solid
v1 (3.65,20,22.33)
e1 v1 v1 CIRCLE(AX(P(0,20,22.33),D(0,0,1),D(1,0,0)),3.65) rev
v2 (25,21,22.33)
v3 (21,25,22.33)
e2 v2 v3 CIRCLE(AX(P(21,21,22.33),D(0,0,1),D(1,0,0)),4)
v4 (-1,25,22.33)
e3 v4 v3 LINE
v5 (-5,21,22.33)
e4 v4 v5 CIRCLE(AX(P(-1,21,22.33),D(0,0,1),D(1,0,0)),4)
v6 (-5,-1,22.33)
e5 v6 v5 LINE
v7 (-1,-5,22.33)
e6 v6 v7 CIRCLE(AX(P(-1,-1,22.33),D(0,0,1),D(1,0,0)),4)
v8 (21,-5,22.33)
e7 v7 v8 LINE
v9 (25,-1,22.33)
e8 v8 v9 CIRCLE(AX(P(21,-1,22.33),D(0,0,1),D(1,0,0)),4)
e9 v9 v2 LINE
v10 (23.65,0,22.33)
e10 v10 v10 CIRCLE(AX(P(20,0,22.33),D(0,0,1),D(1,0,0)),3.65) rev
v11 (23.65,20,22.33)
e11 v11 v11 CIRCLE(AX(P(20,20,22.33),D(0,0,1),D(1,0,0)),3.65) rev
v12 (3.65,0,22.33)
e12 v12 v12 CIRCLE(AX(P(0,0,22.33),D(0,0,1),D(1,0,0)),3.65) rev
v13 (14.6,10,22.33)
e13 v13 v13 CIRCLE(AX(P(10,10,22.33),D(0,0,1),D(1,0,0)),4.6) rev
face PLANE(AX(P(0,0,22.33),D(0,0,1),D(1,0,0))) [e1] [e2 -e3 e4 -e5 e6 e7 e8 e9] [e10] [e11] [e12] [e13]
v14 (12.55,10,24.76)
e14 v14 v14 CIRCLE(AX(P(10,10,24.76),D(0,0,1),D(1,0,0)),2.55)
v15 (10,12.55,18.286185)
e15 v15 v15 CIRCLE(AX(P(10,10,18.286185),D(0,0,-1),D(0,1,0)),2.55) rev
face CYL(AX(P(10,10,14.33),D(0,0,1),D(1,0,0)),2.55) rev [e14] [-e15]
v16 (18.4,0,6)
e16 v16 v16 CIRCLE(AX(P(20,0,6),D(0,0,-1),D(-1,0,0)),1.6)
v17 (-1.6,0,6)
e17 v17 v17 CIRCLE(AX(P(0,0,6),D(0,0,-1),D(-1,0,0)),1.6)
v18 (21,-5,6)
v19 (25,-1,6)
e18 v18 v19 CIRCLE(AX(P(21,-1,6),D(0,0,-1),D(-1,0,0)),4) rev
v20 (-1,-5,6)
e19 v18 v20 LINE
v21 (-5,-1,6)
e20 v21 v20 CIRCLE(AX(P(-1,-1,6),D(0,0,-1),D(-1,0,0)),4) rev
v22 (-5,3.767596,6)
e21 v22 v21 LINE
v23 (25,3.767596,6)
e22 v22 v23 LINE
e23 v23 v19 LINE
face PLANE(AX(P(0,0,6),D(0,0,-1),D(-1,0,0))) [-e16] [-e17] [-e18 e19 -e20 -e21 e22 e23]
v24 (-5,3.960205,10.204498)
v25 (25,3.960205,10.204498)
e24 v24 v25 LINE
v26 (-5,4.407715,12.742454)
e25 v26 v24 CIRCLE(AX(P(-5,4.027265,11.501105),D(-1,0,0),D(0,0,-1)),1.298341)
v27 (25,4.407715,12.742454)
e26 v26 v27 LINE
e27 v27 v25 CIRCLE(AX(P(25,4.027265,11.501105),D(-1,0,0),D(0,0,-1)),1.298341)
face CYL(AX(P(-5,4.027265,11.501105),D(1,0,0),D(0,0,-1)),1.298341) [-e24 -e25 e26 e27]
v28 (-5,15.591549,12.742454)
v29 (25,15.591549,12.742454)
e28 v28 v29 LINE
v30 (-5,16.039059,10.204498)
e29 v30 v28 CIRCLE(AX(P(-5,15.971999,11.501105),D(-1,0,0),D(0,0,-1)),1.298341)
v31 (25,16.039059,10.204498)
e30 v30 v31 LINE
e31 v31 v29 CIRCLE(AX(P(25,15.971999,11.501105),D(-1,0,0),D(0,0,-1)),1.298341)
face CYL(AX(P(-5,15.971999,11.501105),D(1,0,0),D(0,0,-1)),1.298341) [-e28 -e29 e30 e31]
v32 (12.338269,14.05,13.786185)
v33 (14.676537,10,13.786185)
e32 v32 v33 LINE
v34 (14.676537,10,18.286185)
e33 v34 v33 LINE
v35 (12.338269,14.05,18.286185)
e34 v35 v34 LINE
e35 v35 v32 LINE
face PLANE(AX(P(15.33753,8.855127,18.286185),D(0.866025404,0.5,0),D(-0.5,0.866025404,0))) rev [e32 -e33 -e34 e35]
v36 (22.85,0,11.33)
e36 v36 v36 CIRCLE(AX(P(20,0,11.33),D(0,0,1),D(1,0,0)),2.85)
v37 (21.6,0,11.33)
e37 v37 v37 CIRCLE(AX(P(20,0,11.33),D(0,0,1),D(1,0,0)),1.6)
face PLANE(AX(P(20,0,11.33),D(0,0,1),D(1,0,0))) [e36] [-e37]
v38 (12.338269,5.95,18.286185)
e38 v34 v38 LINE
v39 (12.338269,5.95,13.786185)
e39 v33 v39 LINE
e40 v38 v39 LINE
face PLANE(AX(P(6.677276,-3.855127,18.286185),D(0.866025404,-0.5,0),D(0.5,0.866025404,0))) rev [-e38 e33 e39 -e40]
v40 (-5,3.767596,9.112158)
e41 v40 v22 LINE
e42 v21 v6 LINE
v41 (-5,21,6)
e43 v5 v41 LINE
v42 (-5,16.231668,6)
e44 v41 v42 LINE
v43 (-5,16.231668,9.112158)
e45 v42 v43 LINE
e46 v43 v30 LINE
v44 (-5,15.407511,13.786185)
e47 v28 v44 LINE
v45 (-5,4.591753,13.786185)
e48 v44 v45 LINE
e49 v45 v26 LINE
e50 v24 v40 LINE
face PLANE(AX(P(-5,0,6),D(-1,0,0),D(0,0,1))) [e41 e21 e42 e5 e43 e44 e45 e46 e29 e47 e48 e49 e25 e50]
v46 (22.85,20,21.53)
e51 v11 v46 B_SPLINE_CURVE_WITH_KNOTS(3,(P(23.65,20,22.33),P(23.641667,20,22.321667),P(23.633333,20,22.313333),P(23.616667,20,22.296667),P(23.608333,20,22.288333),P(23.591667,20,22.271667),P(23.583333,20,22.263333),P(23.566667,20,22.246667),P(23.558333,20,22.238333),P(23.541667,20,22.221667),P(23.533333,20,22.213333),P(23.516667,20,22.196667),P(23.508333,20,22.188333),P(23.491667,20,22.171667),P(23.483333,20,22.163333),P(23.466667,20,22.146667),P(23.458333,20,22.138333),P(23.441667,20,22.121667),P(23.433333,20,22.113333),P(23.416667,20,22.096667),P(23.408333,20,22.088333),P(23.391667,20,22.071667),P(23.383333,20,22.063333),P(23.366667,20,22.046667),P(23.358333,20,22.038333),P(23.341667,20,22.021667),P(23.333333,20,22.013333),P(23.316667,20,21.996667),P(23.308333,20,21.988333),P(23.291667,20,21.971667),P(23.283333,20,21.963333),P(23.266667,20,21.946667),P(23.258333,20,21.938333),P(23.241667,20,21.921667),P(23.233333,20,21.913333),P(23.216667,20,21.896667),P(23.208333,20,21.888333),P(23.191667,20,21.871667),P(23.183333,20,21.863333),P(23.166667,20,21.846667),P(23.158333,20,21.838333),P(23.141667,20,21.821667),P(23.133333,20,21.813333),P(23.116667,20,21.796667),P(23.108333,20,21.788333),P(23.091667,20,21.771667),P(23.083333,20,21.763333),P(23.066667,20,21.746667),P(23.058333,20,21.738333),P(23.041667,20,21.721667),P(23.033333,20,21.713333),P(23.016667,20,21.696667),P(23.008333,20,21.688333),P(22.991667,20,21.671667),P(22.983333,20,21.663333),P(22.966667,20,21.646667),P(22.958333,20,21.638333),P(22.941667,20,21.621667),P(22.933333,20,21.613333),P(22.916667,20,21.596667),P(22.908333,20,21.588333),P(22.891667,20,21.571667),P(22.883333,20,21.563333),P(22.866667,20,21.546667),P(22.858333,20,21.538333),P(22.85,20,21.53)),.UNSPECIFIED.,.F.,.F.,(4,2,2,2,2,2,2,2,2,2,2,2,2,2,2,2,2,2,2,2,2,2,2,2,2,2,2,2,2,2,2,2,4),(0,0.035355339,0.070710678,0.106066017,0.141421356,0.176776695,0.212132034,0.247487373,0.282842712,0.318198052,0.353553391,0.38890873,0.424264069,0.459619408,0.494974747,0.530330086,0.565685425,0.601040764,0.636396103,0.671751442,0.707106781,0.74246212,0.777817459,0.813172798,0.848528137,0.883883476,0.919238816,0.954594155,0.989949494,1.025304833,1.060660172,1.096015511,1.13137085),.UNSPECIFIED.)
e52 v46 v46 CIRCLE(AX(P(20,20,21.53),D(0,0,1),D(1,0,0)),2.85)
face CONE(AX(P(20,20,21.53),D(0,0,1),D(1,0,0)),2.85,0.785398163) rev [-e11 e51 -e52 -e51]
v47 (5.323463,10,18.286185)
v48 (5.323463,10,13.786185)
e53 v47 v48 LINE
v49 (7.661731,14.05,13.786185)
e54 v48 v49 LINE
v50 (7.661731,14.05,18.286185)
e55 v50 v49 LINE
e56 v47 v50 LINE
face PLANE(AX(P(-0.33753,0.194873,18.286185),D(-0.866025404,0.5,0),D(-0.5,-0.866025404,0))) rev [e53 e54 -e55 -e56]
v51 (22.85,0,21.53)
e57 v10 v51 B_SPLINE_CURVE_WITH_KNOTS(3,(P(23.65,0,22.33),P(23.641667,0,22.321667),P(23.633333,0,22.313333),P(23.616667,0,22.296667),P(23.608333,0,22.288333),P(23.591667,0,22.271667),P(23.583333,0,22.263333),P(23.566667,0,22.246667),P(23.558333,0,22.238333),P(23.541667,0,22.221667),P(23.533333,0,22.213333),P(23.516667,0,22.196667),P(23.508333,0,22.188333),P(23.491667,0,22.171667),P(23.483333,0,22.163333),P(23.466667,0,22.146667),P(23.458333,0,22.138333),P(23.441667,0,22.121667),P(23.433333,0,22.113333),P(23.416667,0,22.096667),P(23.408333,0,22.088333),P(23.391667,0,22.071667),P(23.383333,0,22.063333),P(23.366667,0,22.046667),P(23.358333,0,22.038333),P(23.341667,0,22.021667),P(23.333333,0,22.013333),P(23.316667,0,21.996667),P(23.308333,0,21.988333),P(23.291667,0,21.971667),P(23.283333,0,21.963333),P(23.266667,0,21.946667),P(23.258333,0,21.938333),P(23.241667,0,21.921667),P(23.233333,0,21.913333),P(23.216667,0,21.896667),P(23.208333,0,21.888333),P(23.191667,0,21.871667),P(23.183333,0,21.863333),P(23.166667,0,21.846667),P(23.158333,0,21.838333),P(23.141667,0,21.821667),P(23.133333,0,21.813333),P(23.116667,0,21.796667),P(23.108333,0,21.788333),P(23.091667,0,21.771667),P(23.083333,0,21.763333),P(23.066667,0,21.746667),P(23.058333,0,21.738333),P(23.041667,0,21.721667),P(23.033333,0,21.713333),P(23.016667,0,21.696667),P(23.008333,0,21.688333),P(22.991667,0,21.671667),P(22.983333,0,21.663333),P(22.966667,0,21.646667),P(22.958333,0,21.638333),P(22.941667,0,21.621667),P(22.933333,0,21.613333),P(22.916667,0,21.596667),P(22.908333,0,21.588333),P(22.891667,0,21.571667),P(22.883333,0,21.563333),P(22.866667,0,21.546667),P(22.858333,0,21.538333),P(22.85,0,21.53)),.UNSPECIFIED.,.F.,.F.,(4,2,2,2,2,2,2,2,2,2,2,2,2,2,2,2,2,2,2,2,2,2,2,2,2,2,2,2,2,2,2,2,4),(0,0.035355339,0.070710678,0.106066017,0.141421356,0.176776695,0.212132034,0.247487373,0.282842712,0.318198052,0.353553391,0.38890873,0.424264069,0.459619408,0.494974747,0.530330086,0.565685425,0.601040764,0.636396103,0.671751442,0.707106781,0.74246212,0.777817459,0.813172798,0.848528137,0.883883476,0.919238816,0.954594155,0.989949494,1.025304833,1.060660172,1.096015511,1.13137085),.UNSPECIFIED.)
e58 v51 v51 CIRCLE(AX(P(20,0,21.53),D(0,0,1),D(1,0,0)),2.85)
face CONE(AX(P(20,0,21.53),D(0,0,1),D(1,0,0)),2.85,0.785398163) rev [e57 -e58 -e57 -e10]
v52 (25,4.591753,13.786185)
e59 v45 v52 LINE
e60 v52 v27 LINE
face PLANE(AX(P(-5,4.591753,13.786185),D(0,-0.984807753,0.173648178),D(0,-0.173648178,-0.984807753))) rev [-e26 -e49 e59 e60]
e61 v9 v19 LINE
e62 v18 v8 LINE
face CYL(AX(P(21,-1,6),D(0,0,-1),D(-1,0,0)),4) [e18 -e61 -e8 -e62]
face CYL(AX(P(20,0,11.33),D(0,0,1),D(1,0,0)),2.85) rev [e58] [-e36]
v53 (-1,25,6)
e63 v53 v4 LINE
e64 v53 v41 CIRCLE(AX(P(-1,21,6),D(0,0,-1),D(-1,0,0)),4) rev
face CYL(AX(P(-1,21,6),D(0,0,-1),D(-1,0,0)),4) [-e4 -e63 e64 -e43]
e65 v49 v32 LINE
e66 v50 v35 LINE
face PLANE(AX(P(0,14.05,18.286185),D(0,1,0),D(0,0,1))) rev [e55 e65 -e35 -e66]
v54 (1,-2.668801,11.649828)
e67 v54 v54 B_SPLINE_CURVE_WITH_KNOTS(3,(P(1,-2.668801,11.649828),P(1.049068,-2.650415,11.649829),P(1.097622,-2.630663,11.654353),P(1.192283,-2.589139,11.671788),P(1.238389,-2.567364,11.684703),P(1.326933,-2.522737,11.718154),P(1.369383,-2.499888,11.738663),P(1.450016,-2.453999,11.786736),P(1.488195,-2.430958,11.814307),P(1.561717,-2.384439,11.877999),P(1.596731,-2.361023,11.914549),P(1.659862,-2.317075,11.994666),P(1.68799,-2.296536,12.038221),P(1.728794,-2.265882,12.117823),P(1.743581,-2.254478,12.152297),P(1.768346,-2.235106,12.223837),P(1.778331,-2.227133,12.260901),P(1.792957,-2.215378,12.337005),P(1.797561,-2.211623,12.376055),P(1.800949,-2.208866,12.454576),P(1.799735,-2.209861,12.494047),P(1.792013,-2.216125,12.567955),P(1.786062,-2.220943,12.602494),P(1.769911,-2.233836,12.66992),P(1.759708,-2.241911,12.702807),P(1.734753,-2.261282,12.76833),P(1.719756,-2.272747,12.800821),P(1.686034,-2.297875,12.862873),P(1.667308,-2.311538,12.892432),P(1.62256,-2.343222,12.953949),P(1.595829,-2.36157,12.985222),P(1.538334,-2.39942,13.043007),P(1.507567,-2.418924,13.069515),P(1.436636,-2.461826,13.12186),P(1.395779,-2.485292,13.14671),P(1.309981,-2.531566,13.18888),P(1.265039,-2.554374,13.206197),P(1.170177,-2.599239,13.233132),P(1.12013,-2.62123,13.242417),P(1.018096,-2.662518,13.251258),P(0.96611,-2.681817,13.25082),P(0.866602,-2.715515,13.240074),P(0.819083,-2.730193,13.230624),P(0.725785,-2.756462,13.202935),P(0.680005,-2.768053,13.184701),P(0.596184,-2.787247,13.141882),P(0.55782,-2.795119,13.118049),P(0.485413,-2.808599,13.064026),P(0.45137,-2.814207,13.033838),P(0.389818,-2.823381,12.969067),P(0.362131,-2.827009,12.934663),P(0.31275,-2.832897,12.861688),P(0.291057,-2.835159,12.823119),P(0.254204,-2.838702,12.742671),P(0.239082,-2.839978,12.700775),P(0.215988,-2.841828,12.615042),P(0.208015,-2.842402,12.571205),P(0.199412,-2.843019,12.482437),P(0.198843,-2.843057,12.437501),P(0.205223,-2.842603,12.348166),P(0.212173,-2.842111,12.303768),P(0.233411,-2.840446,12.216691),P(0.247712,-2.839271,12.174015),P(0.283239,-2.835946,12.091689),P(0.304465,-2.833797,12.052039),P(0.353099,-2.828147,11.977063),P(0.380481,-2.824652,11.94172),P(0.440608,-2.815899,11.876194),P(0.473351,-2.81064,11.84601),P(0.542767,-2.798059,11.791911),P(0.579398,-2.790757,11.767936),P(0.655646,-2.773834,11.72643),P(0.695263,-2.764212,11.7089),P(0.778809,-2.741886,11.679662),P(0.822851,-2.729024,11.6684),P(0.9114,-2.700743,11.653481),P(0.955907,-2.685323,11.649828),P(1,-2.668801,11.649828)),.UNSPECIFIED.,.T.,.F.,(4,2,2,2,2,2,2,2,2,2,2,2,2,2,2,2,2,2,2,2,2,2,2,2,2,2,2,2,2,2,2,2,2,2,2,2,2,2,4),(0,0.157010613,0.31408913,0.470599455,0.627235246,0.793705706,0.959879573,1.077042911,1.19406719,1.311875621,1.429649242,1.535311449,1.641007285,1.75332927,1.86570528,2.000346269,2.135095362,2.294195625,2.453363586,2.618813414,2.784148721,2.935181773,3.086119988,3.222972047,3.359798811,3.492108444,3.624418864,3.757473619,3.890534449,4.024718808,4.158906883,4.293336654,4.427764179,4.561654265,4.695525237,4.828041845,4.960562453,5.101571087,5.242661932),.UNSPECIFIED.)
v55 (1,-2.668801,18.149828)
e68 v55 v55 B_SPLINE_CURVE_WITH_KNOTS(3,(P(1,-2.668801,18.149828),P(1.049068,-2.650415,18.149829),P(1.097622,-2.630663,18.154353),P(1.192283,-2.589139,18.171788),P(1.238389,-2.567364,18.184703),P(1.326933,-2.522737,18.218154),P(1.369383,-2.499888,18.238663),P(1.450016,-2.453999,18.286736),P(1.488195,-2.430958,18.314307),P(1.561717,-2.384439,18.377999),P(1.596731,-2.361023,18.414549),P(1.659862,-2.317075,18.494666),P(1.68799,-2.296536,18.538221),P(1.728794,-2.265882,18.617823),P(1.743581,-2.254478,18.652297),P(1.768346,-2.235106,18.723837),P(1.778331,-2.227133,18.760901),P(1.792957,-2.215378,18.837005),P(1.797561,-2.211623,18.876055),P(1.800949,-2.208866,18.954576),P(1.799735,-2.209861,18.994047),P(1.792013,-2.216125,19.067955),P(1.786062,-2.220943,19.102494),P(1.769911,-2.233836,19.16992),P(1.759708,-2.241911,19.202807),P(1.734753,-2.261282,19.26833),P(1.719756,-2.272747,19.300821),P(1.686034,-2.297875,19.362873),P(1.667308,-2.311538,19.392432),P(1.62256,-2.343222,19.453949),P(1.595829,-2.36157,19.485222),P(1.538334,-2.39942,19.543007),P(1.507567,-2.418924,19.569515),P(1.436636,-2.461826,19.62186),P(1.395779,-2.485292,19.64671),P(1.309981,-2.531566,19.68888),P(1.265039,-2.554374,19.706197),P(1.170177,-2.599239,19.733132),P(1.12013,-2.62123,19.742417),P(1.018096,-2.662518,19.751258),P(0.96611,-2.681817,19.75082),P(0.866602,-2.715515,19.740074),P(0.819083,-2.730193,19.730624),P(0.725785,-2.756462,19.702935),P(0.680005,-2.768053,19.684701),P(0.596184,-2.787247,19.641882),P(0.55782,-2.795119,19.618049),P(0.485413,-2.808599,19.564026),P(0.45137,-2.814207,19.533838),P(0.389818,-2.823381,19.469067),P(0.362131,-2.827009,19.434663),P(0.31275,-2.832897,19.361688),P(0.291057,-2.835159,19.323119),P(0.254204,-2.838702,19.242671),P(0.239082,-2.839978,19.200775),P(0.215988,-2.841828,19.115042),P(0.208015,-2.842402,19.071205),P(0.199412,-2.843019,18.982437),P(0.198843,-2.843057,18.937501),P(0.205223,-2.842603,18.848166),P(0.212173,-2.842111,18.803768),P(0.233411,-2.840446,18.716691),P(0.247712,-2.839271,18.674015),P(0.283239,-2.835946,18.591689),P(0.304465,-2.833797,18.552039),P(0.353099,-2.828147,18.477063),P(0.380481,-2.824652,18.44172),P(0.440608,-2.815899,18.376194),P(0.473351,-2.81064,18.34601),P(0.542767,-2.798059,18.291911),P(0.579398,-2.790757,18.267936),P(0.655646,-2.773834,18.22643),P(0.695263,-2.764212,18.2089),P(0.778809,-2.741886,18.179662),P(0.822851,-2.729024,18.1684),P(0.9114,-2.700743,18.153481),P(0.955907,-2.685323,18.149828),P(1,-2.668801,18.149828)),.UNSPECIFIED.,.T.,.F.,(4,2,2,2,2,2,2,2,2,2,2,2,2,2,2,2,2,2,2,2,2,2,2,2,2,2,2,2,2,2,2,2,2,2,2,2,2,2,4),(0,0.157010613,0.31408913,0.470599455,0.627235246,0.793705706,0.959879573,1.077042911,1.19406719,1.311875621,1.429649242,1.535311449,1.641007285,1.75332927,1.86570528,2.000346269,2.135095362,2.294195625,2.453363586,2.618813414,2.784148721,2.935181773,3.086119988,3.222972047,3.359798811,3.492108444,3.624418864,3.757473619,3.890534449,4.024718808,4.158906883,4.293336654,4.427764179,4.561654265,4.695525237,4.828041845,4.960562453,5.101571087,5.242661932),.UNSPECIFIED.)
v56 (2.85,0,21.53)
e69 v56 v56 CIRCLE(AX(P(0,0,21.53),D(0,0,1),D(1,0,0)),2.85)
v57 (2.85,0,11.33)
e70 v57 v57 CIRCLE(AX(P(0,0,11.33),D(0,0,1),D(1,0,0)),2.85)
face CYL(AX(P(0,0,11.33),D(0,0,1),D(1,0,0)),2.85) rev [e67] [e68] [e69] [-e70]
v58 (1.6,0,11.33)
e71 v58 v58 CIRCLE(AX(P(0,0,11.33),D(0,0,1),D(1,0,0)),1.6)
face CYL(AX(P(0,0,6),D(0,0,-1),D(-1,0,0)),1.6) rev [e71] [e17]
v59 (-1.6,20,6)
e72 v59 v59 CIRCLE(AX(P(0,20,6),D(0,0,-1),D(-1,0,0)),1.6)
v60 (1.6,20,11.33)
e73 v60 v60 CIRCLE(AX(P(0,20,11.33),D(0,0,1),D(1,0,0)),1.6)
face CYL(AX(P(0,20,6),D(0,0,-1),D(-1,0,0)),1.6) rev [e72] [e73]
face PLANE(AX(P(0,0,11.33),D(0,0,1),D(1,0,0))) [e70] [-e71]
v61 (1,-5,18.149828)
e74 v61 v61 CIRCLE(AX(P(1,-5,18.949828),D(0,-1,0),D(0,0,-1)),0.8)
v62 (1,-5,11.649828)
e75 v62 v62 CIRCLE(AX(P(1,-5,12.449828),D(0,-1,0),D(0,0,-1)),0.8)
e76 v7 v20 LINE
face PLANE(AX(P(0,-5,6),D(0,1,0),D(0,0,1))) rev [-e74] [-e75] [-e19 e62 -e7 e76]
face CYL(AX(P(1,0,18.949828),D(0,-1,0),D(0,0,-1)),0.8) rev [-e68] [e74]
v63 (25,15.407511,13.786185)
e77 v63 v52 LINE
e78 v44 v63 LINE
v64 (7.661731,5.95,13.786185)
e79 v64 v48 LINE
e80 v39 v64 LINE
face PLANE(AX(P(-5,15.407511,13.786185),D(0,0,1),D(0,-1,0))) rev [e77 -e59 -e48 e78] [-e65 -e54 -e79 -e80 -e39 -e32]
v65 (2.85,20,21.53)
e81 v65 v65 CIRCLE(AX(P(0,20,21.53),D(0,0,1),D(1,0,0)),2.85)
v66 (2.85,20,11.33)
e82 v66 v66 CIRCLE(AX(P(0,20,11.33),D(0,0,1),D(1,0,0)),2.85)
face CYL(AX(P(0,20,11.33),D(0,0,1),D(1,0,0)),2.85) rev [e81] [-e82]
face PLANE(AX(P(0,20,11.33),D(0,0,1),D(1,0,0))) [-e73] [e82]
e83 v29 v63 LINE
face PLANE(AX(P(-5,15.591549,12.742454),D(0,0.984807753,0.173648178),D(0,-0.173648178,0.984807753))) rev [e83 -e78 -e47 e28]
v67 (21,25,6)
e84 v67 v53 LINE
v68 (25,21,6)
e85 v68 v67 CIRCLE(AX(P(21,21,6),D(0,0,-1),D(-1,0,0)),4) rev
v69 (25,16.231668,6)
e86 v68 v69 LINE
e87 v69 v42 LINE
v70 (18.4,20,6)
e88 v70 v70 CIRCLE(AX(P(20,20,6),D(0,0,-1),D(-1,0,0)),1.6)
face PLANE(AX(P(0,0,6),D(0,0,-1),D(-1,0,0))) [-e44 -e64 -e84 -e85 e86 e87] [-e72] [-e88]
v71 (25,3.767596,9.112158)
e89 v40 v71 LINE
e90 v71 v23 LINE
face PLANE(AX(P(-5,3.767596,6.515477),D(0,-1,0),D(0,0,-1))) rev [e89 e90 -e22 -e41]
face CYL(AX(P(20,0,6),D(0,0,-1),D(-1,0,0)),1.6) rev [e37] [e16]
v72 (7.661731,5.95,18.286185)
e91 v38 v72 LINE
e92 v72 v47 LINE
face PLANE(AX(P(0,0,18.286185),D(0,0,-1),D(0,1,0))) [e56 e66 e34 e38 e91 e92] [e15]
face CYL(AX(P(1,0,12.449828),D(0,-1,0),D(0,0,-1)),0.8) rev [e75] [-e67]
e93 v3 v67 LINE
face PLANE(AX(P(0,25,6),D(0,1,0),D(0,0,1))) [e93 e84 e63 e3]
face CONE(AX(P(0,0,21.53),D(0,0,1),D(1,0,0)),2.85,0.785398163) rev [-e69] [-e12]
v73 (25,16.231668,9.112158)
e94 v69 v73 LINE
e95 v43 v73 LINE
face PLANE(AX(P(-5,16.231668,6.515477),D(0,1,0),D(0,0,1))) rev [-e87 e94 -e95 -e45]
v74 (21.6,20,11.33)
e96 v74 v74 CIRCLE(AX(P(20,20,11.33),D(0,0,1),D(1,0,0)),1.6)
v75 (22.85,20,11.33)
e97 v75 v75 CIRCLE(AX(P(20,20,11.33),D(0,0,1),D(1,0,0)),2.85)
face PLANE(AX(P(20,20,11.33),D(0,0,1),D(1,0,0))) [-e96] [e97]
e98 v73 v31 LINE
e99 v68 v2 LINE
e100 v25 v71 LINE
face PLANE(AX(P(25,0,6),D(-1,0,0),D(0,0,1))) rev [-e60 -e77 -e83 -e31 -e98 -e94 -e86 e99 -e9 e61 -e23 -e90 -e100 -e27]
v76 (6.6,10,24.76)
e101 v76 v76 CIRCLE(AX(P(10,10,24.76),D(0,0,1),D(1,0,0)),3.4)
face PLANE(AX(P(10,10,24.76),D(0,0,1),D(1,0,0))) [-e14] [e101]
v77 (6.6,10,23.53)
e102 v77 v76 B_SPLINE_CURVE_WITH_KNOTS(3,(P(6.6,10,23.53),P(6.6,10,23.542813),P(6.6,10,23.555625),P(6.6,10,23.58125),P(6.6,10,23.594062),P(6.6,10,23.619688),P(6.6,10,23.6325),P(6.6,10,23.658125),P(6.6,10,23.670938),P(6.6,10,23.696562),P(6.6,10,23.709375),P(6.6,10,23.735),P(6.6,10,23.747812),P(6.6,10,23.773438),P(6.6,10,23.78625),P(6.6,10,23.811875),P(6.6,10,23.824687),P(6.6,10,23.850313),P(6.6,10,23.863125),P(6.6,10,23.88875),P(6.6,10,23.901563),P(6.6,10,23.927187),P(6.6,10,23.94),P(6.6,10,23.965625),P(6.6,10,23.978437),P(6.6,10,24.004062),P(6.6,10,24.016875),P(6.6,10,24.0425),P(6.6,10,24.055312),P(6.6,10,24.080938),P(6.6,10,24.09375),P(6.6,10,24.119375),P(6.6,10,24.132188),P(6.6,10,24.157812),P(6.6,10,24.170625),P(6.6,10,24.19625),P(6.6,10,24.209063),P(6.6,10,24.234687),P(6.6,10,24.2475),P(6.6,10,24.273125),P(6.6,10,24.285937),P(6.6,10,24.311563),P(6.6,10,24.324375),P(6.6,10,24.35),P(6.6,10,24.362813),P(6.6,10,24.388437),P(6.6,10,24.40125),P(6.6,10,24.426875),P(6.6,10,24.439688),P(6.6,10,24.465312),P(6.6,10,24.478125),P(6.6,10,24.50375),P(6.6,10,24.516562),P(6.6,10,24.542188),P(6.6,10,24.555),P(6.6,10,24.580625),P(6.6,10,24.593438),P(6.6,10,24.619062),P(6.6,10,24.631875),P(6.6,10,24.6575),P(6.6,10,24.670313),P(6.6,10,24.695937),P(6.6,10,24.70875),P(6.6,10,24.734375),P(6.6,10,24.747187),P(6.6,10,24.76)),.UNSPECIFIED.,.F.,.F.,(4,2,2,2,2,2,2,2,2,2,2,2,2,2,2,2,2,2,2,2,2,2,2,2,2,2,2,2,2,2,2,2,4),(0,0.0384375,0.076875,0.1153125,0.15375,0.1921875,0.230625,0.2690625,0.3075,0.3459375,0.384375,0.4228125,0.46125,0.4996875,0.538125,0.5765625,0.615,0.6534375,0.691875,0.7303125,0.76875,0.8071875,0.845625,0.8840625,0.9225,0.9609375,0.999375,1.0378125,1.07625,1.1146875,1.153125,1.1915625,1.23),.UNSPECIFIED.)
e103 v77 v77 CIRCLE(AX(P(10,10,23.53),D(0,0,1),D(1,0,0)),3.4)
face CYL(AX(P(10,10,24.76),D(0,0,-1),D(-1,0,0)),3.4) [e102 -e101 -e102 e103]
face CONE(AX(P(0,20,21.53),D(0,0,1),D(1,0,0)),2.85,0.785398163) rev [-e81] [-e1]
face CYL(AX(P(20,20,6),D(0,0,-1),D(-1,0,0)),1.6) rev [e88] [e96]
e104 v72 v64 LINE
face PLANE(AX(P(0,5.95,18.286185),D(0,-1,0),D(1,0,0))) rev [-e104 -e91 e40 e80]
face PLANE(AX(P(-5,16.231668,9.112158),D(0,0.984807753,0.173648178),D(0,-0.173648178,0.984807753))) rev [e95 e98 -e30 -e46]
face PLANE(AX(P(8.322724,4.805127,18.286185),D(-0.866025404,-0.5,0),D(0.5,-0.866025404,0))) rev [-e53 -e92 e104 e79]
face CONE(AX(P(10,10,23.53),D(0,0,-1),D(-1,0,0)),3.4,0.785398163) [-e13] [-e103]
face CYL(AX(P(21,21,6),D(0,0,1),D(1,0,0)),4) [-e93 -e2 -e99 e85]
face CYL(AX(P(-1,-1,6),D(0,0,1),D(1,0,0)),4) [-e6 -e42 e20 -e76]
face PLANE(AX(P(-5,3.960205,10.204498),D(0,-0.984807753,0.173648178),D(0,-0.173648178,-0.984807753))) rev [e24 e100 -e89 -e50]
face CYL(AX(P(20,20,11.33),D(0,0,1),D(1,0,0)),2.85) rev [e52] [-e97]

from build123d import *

# Parameters (mm, degrees)
SKETCH1_W                  = 30
SKETCH1_H                  = 30
SKETCH1_R                  = 1.6
SKETCH1_W_2                = 70
SKETCH1_H_2                = 12
BOSS_EXTRUDE1_DEPTH        = 6
SKETCH1_3_W                = 30
SKETCH1_3_H                = 30
SKETCH1_3_R                = 1.6
BOSS_EXTRUDE2_DEPTH        = 22.33
CUT_EXTRUDE1_DEPTH         = 78.612040947
SKETCH3_R                  = 2.55
CUT_EXTRUDE2_DEPTH         = 8
CUT_EXTRUDE3_DEPTH         = 4.5
SKETCH6_R                  = 5
CUT_EXTRUDE5_DEPTH         = 8.6
SKETCH7_R                  = 1.6
CUT_EXTRUDE6_DEPTH         = 101.740403513
SKETCH8_R                  = 2.85
CUT_EXTRUDE7_DEPTH         = 11
BOSS_EXTRUDE3_START        = 2.43
SKETCH9_R                  = 3.4
SKETCH9_R_2                = 2.55
BOSS_EXTRUDE3_DEPTH        = 2.43
CHAMFER1_SIZE              = 1.2
FILLET3_R                  = 4
CHAMFER2_SIZE              = 0.8
CUT_EXTRUDE8_DEPTH         = 3
CHAMFER3_SIZE              = 0.8
LPATTERN1_COUNT            = 3
LPATTERN1_PITCH            = 25
CHAMFER3_OF_LPATTERN1_SIZE = 0.8
SKETCH12_W                 = 103.210606925
SKETCH12_H                 = 33.832940417
CUT_EXTRUDE9_DEPTH         = 6
SKETCH13_R                 = 0.8
CUT_EXTRUDE10_DEPTH        = 5


with BuildPart() as part:
    # Sketch1 → Boss-Extrude1 (new body)
    # profile 1 of 2: a face of its own
    with BuildSketch(Plane.XY):
        with Locations((10, 10)):
            Rectangle(SKETCH1_W, SKETCH1_H)
        with Locations((20, 0)):
            Circle(SKETCH1_R, mode=Mode.SUBTRACT)
        with Locations((20, 20)):
            Circle(SKETCH1_R, mode=Mode.SUBTRACT)
        with Locations((0, 20)):
            Circle(SKETCH1_R, mode=Mode.SUBTRACT)
        Circle(SKETCH1_R, mode=Mode.SUBTRACT)
    # profile 2 of 2: a face of its own
    with BuildSketch(Plane.XY):
        with Locations((60, 10)):
            Rectangle(SKETCH1_W_2, SKETCH1_H_2)
    extrude(amount=BOSS_EXTRUDE1_DEPTH)

    # Sketch1<3> → Boss-Extrude2 (add)
    with BuildSketch(Plane.XY):
        with Locations((10, 10)):
            Rectangle(SKETCH1_3_W, SKETCH1_3_H)
        with Locations((20, 0)):
            Circle(SKETCH1_3_R, mode=Mode.SUBTRACT)
        with Locations((20, 20)):
            Circle(SKETCH1_3_R, mode=Mode.SUBTRACT)
        with Locations((0, 20)):
            Circle(SKETCH1_3_R, mode=Mode.SUBTRACT)
        Circle(SKETCH1_3_R, mode=Mode.SUBTRACT)
    extrude(amount=BOSS_EXTRUDE2_DEPTH)

    # Sketch2 → Cut-Extrude1 (cut, through all)
    with BuildSketch(Plane(origin=(25, 0, 0), x_dir=(0, 0, -1), z_dir=(1, 0, 0))):
        with BuildLine():
            Line((-6.515476918, 16.231667643), (-9.112158418, 16.231667643))
            Line((-9.112158418, 16.231667643), (-10.20449761, 16.039058771))
            ThreePointArc((-10.20449761, 16.039058771), (-11.275650893, 14.693383456), (-12.742453793, 15.59154862))
            Line((-12.742453793, 15.59154862), (-13.786185118, 15.407510627))
            Line((-13.786185118, 15.407510627), (-13.786185118, 4.591753459))
            Line((-13.786185118, 4.591753459), (-12.742453793, 4.407715465))
            ThreePointArc((-12.742453793, 4.407715465), (-11.275650893, 5.305880629), (-10.20449761, 3.960205314))
            Line((-10.20449761, 3.960205314), (-9.112158418, 3.767596443))
            Line((-9.112158418, 3.767596443), (-6.515476918, 3.767596443))
            Line((-6.515476918, 3.767596443), (-5.902540869, 3.767596443))
            Line((-5.902540869, 3.767596443), (-5.902540869, 16.231667643))
            Line((-5.902540869, 16.231667643), (-6.515476918, 16.231667643))
        make_face()
    extrude(amount=-CUT_EXTRUDE1_DEPTH, mode=Mode.SUBTRACT)

    # Sketch3 → Cut-Extrude2 (cut)
    with BuildSketch(Plane.XY.offset(22.33)):
        with Locations((10, 10)):
            Circle(SKETCH3_R)
    extrude(amount=-CUT_EXTRUDE2_DEPTH, mode=Mode.SUBTRACT)

    # Sketch5 → Cut-Extrude3 (cut)
    with BuildSketch(Plane(origin=(0, 0, 13.786185118), x_dir=(-1, 0, 0), z_dir=(0, 0, -1))):
        Polygon((-5.32346282, 10), (-7.66173141, 14.05), (-12.33826859, 14.05), (-14.67653718, 10), (-12.33826859, 5.95), (-7.66173141, 5.95), align=None)
    extrude(amount=-CUT_EXTRUDE3_DEPTH, mode=Mode.SUBTRACT)

    # Sketch6 → Cut-Extrude5 (cut)
    with BuildSketch(Plane(origin=(0, 0, 0), x_dir=(-1, 0, 0), z_dir=(0, 0, -1))):
        with Locations((-10, 10)):
            Circle(SKETCH6_R)
    extrude(amount=-CUT_EXTRUDE5_DEPTH, mode=Mode.SUBTRACT)

    # Sketch7 → Cut-Extrude6 (cut, through all)
    with BuildSketch(Plane(origin=(0, 0, 0), x_dir=(-1, 0, 0), z_dir=(0, 0, -1))):
        with BuildLine():
            ThreePointArc((-90.1, 10), (-88.5, 8.4), (-86.9, 10))
            Line((-86.9, 10), (-90.1, 10))
        make_face()
        with BuildLine():
            Line((-90.1, 10), (-86.9, 10))
            ThreePointArc((-86.9, 10), (-88.5, 11.6), (-90.1, 10))
        make_face()
        with Locations((-63.5, 10)):
            Circle(SKETCH7_R)
        with Locations((-38.5, 10)):
            Circle(SKETCH7_R)
    extrude(amount=-CUT_EXTRUDE6_DEPTH, mode=Mode.SUBTRACT)

    # Sketch8 → Cut-Extrude7 (cut)
    with BuildSketch(Plane.XY.offset(22.33)):
        with Locations((20, 20)):
            Circle(SKETCH8_R)
        with Locations((20, 0)):
            Circle(SKETCH8_R)
        Circle(SKETCH8_R)
        with Locations((0, 20)):
            Circle(SKETCH8_R)
    extrude(amount=-CUT_EXTRUDE7_DEPTH, mode=Mode.SUBTRACT)

    # Sketch9 → Boss-Extrude3 (add)
    with BuildSketch(Plane.XY.offset(22.33).offset(BOSS_EXTRUDE3_START)):
        with Locations(Location((10, 10, 0), (0, 0, 180))):
            Circle(SKETCH9_R)
        with Locations((10, 10)):
            Circle(SKETCH9_R_2, mode=Mode.SUBTRACT)
    extrude(amount=-BOSS_EXTRUDE3_DEPTH)

    # Chamfer1
    chamfer1_edges = [part.edges().sort_by_distance(p)[0] for p in [
        (13.4, 10, 22.33),
    ]]
    chamfer(chamfer1_edges, length=CHAMFER1_SIZE)

    # Fillet3
    # the kernel refuses this fillet: 4 mm, written as the material it adds along each edge
    with BuildSketch(Plane(origin=(25, 4, 0), x_dir=(0, -1, 0), z_dir=(0, 0, 1))) as fillet3_piece_1:
        with BuildLine():
            CenterArc((FILLET3_R, FILLET3_R), FILLET3_R, 180, 90)
            Line((0, FILLET3_R), (0, 0))
            Line((0, 0), (FILLET3_R, 0))
        make_face()
    extrude(amount=5.902540869)
    with BuildSketch(Plane(origin=(25, 16, 0), x_dir=(0, 1, 0), z_dir=(0, 0, 1))) as fillet3_piece_2:
        with BuildLine():
            CenterArc((FILLET3_R, -FILLET3_R), FILLET3_R, 90, 90)
            Line((0, -FILLET3_R), (0, 0))
            Line((0, 0), (FILLET3_R, 0))
        make_face()
    extrude(amount=5.902540869)
    # the kernel refuses this fillet: 4 mm, written as the material it takes off along each edge
    with BuildSketch(Plane(origin=(-5, -5, 32.33), x_dir=(1, 0, 0), z_dir=(0, 0, -1)), Plane(origin=(-5, 25, 32.33), x_dir=(0, -1, 0), z_dir=(0, 0, -1)), Plane(origin=(25, 25, -10), x_dir=(0, -1, 0), z_dir=(0, 0, 1)), Plane(origin=(25, -5, -10), x_dir=(-1, 0, 0), z_dir=(0, 0, 1))) as fillet3_2_piece_1:
        with BuildLine():
            CenterArc((FILLET3_R, -FILLET3_R), FILLET3_R, 90, 90)
            Line((0, -FILLET3_R), (0, 0))
            Line((0, 0), (FILLET3_R, 0))
        make_face()
    extrude(amount=42.33, mode=Mode.SUBTRACT)
    with BuildSketch(Plane(origin=(95, 16, -10), x_dir=(-1, 0, 0), z_dir=(0, 0, 1))) as fillet3_2_piece_2:
        with BuildLine():
            CenterArc((FILLET3_R, FILLET3_R), FILLET3_R, 180, 90)
            Line((0, FILLET3_R), (0, 0))
            Line((0, 0), (FILLET3_R, 0))
        make_face()
    extrude(amount=26, mode=Mode.SUBTRACT)
    with BuildSketch(Plane(origin=(95, 4, -10), x_dir=(-1, 0, 0), z_dir=(0, 0, 1))) as fillet3_2_piece_3:
        with BuildLine():
            CenterArc((FILLET3_R, -FILLET3_R), FILLET3_R, 90, 90)
            Line((0, -FILLET3_R), (0, 0))
            Line((0, 0), (FILLET3_R, 0))
        make_face()
    extrude(amount=26, mode=Mode.SUBTRACT)

    # Chamfer2
    chamfer2_edges = [part.edges().sort_by_distance(p)[0] for p in [
        (-2.85, 20, 22.33),
        (-2.85, 0, 22.33),
        (17.15, 0, 22.33),
        (17.15, 20, 22.33),
    ]]
    chamfer(chamfer2_edges, length=CHAMFER2_SIZE)

    # Sketch10 → Cut-Extrude8 (cut)
    with BuildSketch(Plane(origin=(0, 0, 0), x_dir=(-1, 0, 0), z_dir=(0, 0, -1))):
        Polygon((-85.266838493, 10), (-86.883419246, 12.8), (-90.116580754, 12.8), (-91.733161507, 10), (-90.116580754, 7.2), (-86.883419246, 7.2), align=None)
    cut_extrude8 = extrude(amount=-CUT_EXTRUDE8_DEPTH, mode=Mode.SUBTRACT)

    # Chamfer3
    chamfer3_edges = [part.edges().sort_by_distance(p)[0] for p in [
        (86.075128869, 8.6, 0),
        (86.075128869, 11.4, 0),
        (88.5, 12.8, 0),
        (90.924871131, 11.4, 0),
        (90.924871131, 8.6, 0),
        (88.5, 7.2, 0),
    ]]
    chamfer(chamfer3_edges, length=CHAMFER3_SIZE)

    # LPattern1: Cut-Extrude8 ×3
    with Locations(*[(-i * LPATTERN1_PITCH, 0, 0) for i in range(1, LPATTERN1_COUNT)]):
        add(cut_extrude8, mode=Mode.SUBTRACT)

    # Chamfer3 of LPattern1
    chamfer3_of_lpattern1_edges = [part.edges().sort_by_distance(p)[0] for p in [
        (61.075128869, 8.6, 0),
        (61.075128869, 11.4, 0),
        (63.5, 12.8, 0),
        (65.924871131, 11.4, 0),
        (65.924871131, 8.6, 0),
        (63.5, 7.2, 0),
        (36.075128869, 8.6, 0),
        (36.075128869, 11.4, 0),
        (38.5, 12.8, 0),
        (40.924871131, 11.4, 0),
        (40.924871131, 8.6, 0),
        (38.5, 7.2, 0),
    ]]
    chamfer(chamfer3_of_lpattern1_edges, length=CHAMFER3_OF_LPATTERN1_SIZE)

    # Sketch12 → Cut-Extrude9 (cut)
    with BuildSketch(Plane(origin=(0, 0, 0), x_dir=(-1, 0, 0), z_dir=(0, 0, -1))):
        with Locations((-45.050346637, 9.848960088)):
            Rectangle(SKETCH12_W, SKETCH12_H)
    extrude(amount=-CUT_EXTRUDE9_DEPTH, mode=Mode.SUBTRACT)

    # Sketch13 → Cut-Extrude10 (cut)
    with BuildSketch(Plane.XZ.offset(5)):
        with Locations(Location((1, 18.949828429, 0), (0, 0, 270))):
            Circle(SKETCH13_R)
        with Locations(Location((1, 12.449828429, 0), (0, 0, 270))):
            Circle(SKETCH13_R)
    extrude(amount=-CUT_EXTRUDE10_DEPTH, mode=Mode.SUBTRACT)


solid = part.part
